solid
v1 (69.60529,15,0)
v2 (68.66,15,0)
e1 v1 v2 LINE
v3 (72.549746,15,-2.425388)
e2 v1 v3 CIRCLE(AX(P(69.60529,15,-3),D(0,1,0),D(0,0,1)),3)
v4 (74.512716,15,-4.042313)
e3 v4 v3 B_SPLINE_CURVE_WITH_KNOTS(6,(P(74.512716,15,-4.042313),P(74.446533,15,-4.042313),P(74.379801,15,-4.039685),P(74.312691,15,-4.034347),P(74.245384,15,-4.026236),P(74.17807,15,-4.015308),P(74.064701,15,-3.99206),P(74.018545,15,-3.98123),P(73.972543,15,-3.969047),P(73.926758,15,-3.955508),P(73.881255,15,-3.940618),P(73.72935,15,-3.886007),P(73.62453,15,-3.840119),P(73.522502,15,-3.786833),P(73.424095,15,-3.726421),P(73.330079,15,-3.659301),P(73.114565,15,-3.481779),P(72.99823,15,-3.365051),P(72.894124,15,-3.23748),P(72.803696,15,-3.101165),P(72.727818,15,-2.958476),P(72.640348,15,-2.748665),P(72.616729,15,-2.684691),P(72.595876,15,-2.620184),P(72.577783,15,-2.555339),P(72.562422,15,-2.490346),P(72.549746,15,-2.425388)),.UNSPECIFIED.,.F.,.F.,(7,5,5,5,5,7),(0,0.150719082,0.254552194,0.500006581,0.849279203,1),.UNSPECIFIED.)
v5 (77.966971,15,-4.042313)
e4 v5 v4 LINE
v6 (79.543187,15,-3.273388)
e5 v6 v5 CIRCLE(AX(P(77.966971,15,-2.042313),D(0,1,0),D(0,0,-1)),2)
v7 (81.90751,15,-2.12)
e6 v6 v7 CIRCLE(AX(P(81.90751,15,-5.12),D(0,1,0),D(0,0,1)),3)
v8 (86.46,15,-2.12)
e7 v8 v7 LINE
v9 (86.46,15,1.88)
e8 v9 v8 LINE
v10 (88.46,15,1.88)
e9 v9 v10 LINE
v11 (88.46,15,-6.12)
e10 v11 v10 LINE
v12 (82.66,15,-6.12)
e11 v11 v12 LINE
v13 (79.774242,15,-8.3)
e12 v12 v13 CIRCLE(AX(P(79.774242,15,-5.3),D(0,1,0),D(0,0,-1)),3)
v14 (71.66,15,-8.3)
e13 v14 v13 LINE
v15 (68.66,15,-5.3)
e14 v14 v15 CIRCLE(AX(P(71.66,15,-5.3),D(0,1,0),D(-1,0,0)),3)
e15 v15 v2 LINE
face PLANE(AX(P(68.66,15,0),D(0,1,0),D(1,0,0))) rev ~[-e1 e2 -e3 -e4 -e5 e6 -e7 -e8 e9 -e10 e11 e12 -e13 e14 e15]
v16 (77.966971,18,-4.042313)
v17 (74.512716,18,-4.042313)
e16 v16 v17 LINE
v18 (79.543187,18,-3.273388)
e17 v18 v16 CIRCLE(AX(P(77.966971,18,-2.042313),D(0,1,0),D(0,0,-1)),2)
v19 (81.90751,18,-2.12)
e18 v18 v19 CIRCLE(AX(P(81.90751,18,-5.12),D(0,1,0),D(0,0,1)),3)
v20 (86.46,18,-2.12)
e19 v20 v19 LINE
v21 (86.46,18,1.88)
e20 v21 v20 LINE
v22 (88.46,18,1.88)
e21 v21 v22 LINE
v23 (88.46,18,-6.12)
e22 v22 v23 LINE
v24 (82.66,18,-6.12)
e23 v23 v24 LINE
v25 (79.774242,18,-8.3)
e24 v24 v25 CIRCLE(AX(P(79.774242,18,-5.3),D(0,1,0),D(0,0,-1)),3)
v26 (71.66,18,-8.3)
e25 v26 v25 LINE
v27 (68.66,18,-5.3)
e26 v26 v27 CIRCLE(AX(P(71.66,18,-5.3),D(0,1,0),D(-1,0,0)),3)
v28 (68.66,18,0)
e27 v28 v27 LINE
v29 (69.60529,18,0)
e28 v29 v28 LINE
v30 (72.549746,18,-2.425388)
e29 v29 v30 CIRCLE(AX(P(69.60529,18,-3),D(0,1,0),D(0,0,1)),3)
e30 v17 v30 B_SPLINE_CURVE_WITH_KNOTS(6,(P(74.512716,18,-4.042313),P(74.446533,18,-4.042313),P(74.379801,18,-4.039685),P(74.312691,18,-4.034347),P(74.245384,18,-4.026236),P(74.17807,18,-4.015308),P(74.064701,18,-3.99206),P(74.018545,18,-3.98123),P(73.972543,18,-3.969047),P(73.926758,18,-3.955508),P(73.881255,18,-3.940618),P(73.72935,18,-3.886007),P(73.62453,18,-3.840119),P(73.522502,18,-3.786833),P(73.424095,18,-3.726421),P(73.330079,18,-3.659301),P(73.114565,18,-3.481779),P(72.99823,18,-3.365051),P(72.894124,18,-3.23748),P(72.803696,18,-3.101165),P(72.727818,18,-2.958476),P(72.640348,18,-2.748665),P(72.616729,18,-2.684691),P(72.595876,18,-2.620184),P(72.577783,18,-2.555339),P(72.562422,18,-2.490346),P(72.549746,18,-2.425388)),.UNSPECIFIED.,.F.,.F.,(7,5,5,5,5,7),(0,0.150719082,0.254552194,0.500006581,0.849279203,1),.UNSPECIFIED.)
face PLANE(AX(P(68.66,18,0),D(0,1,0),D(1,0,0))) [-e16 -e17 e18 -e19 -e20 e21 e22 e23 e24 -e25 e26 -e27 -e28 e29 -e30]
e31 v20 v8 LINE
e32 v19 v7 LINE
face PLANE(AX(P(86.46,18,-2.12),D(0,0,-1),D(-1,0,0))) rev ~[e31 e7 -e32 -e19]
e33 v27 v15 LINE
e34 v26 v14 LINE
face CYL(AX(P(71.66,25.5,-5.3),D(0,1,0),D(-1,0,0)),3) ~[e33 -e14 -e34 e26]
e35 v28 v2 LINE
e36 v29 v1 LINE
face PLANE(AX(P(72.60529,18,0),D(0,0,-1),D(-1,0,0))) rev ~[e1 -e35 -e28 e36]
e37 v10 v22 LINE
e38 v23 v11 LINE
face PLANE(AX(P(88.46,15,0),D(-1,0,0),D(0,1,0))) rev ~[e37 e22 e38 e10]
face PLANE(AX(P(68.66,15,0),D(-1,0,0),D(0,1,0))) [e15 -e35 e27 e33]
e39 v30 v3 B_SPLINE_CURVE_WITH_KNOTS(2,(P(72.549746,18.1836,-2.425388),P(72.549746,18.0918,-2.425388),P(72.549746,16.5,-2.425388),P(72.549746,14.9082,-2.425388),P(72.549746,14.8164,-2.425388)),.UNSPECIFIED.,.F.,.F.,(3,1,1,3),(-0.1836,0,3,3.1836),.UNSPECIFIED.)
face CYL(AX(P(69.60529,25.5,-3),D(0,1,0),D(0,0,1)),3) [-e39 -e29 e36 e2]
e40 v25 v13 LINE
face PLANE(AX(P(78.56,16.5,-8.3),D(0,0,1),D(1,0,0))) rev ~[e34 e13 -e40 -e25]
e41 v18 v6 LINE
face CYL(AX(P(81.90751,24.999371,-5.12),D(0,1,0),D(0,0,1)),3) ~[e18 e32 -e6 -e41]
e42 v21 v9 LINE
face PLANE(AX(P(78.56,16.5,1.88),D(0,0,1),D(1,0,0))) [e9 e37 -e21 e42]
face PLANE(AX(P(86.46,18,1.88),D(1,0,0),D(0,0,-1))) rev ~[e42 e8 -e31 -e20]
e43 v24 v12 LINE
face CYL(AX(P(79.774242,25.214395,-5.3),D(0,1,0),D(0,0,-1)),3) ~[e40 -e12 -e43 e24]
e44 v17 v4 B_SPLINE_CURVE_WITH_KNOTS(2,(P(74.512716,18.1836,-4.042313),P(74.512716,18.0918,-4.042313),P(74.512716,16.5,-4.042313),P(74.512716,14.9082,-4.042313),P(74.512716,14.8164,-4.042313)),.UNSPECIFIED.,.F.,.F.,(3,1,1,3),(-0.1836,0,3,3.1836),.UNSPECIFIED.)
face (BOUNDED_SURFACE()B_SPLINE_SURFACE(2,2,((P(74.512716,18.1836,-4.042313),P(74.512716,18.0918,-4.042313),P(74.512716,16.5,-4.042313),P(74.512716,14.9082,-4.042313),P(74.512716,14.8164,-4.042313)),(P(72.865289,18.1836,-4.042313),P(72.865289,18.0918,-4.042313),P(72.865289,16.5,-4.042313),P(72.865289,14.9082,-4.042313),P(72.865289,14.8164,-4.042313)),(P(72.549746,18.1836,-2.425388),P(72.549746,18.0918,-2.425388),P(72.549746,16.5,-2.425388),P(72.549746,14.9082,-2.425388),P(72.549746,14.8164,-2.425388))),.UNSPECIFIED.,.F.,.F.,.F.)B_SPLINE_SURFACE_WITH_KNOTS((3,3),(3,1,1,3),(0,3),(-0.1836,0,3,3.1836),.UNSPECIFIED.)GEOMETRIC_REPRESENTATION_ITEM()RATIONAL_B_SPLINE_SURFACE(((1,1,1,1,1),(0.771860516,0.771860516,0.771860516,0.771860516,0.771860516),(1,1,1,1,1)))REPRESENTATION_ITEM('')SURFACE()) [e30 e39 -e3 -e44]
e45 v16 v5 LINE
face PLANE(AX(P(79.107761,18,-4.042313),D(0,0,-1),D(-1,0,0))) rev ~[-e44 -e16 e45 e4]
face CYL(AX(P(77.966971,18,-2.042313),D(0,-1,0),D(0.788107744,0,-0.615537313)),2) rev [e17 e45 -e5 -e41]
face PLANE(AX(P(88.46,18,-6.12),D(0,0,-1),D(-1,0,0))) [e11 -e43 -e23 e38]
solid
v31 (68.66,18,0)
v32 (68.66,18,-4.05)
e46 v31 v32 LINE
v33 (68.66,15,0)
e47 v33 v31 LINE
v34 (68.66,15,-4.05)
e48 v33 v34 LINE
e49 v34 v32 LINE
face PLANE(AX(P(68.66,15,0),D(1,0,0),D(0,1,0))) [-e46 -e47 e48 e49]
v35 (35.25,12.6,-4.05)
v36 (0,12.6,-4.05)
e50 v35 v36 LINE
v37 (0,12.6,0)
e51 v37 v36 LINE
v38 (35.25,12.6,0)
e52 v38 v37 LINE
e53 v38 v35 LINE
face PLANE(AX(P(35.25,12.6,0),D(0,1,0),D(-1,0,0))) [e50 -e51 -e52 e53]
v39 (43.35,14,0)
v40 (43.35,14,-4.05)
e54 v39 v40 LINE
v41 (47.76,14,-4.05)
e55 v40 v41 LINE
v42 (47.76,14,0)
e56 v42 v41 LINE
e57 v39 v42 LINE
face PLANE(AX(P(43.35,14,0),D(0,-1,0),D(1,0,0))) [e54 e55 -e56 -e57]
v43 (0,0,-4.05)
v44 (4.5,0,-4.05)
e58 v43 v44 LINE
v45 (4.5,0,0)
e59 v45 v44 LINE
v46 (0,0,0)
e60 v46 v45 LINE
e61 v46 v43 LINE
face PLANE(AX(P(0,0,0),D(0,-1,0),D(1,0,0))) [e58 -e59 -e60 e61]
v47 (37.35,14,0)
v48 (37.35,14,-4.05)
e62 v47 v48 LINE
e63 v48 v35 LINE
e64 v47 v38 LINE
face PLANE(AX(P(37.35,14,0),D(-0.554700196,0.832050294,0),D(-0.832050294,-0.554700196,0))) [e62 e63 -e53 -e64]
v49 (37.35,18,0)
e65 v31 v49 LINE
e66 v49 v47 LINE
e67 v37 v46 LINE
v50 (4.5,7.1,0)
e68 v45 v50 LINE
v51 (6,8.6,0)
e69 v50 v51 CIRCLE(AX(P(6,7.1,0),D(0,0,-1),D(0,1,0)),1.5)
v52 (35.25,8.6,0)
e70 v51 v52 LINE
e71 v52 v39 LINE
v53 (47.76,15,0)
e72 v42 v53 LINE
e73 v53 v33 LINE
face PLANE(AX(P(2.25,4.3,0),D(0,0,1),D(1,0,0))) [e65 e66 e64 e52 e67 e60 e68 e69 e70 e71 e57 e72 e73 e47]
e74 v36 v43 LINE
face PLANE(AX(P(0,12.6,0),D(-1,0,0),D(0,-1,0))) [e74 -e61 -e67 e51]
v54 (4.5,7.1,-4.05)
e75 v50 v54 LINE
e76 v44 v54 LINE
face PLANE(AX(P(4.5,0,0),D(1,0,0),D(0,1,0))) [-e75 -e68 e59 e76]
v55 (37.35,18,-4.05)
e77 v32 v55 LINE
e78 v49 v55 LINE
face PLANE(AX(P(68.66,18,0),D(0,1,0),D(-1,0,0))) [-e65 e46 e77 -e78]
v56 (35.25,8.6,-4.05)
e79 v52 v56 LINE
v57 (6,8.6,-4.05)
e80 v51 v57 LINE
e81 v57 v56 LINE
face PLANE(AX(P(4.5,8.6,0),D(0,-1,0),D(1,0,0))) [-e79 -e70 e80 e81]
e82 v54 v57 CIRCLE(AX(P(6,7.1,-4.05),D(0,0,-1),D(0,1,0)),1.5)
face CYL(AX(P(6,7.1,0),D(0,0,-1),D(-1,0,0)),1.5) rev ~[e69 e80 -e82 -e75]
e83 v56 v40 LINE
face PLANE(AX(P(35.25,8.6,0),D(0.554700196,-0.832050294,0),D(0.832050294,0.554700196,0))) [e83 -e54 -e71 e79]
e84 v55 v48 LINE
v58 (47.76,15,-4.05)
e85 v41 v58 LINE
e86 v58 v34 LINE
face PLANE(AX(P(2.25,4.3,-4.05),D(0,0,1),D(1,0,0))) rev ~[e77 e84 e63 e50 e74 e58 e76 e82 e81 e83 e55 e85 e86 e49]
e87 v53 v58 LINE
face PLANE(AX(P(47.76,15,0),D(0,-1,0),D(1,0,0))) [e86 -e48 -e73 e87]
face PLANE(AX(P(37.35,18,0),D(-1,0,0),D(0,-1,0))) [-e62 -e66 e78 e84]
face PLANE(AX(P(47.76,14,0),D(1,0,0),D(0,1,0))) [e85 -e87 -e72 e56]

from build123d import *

# Parameters (mm, degrees)
F0_W        = 4.5
F0_H        = 8.6
F0_W_2      = 20.9
F0_H_2      = 3
F1_DEPTH    = 4.05
F0_W_3      = 19.8
F2_DEPTH    = 8.3
F3_DEPTH    = 1.88
F4_W        = 5.8
F4_H        = 2.18
F5_DEPTH    = 25
F6_T1_DEPTH = 18
F6_T3_DEPTH = 17.4287906631
F6_T5_DEPTH = 16.9987425023
F7_R        = 2
F8_R        = 1.5


# Not quite as in the source:
# - a fillet or chamfer that OpenCascade refuses, or shapes differently, is made with other operations: its cross-section is extruded or revolved along the edge and cut away or added
# - a feature names something its author has since deleted; it is built from what else it names


with BuildPart() as f1:
    # F0 (on Top) → F1 (new body)
    with BuildSketch(Plane.XY):
        with Locations((2.25, 4.3)):
            Rectangle(F0_W, F0_H)
        Polygon((0, 12.6), (0, 8.6), (4.5, 8.6), (35.25, 8.6), (35.25, 12.6), align=None)
        Polygon((35.25, 12.6), (35.25, 8.6), (43.35, 14), (37.35, 14), align=None)
        Polygon((37.35, 14), (43.35, 14), (47.76, 14), (47.76, 15), (47.76, 18), (37.35, 18), align=None)
        with Locations((58.21, 16.5)):
            Rectangle(F0_W_2, F0_H_2)
    extrude(amount=-F1_DEPTH)

    # F8
    f8_edges = [f1.edges().sort_by_distance(p)[0] for p in [
        (4.5, 8.6, -2.025),
    ]]
    fillet(f8_edges, radius=F8_R)


with BuildPart() as f2:
    # F0 (on Top) → F2 (new body)
    with BuildSketch(Plane.XY):
        with Locations((78.56, 16.5)):
            Rectangle(F0_W_3, F0_H_2)
    extrude(amount=-F2_DEPTH)

    # F0 (on Top) → F3 (join)
    with BuildSketch(Plane.XY):
        with Locations((78.56, 16.5)):
            Rectangle(F0_W_3, F0_H_2)
    extrude(amount=F3_DEPTH)

    # F4 (on face) → F5 (cut)
    with BuildSketch(Plane(origin=(0, 18, 0), x_dir=(-1, 0, 0), z_dir=(0, 1, 0))):
        with Locations((-85.56, -7.21)):
            Rectangle(F4_W, F4_H)
        Polygon((-68.66, 1.88), (-86.46, 1.88), (-86.46, -2.12), (-82.66, -2.12), (-79.1077613831, -2.12), (-79.1077613831, -4.0423134342), (-72.6052895188, -4.0423134342), (-72.6052895188, 0), (-68.66, 0), align=None)
    extrude(amount=-F5_DEPTH, mode=Mode.SUBTRACT)

    # F6: fillet of radius 3 on 4 edges, made by hand

    # F6_s2 → F6_t1 (cut)
    with BuildSketch(Plane.XZ.offset(-25.5)):
        with BuildLine():
            ThreePointArc((68.66, -5.3), (69.5386796564, -7.4213203436), (71.66, -8.3))
            Line((71.66, -8.3), (68.66, -8.3))
            Line((68.66, -8.3), (68.66, -5.3))
        make_face()
        with BuildLine():
            ThreePointArc((69.6052895188, 0), (71.7266098624, -0.8786796564), (72.6052895188, -3))
            Line((72.6052895188, -3), (72.6052895188, 0))
            Line((72.6052895188, 0), (69.6052895188, 0))
        make_face()
    extrude(amount=F6_T1_DEPTH, mode=Mode.SUBTRACT)

    # F6_s4 → F6_t3 (cut)
    with BuildSketch(Plane.XZ.offset(-25.2143953316)):
        with BuildLine():
            ThreePointArc((79.7742418674, -8.3), (81.5825559994, -7.6937418407), (82.66, -6.12))
            Line((82.66, -6.12), (82.66, -8.3))
            Line((82.66, -8.3), (79.7742418674, -8.3))
        make_face()
    extrude(amount=F6_T3_DEPTH, mode=Mode.SUBTRACT)

    # F6_s6 → F6_t5 (cut)
    with BuildSketch(Plane.XZ.offset(-24.9993712512)):
        with BuildLine():
            ThreePointArc((81.9075098835, -2.12), (80.2094315133, -2.6468380868), (79.1077613831, -4.0423134342))
            Line((79.1077613831, -4.0423134342), (79.1077613831, -2.12))
            Line((79.1077613831, -2.12), (81.9075098835, -2.12))
        make_face()
    extrude(amount=F6_T5_DEPTH, mode=Mode.SUBTRACT)

    # F7
    f7_edges = [f2.edges().sort_by_distance(p)[0] for p in [
        (72.60529, 16.5, -4.042313),
        (79.107761, 16.5, -4.042313),
    ]]
    fillet(f7_edges, radius=F7_R)


solid = Compound([f1.part, f2.part])
